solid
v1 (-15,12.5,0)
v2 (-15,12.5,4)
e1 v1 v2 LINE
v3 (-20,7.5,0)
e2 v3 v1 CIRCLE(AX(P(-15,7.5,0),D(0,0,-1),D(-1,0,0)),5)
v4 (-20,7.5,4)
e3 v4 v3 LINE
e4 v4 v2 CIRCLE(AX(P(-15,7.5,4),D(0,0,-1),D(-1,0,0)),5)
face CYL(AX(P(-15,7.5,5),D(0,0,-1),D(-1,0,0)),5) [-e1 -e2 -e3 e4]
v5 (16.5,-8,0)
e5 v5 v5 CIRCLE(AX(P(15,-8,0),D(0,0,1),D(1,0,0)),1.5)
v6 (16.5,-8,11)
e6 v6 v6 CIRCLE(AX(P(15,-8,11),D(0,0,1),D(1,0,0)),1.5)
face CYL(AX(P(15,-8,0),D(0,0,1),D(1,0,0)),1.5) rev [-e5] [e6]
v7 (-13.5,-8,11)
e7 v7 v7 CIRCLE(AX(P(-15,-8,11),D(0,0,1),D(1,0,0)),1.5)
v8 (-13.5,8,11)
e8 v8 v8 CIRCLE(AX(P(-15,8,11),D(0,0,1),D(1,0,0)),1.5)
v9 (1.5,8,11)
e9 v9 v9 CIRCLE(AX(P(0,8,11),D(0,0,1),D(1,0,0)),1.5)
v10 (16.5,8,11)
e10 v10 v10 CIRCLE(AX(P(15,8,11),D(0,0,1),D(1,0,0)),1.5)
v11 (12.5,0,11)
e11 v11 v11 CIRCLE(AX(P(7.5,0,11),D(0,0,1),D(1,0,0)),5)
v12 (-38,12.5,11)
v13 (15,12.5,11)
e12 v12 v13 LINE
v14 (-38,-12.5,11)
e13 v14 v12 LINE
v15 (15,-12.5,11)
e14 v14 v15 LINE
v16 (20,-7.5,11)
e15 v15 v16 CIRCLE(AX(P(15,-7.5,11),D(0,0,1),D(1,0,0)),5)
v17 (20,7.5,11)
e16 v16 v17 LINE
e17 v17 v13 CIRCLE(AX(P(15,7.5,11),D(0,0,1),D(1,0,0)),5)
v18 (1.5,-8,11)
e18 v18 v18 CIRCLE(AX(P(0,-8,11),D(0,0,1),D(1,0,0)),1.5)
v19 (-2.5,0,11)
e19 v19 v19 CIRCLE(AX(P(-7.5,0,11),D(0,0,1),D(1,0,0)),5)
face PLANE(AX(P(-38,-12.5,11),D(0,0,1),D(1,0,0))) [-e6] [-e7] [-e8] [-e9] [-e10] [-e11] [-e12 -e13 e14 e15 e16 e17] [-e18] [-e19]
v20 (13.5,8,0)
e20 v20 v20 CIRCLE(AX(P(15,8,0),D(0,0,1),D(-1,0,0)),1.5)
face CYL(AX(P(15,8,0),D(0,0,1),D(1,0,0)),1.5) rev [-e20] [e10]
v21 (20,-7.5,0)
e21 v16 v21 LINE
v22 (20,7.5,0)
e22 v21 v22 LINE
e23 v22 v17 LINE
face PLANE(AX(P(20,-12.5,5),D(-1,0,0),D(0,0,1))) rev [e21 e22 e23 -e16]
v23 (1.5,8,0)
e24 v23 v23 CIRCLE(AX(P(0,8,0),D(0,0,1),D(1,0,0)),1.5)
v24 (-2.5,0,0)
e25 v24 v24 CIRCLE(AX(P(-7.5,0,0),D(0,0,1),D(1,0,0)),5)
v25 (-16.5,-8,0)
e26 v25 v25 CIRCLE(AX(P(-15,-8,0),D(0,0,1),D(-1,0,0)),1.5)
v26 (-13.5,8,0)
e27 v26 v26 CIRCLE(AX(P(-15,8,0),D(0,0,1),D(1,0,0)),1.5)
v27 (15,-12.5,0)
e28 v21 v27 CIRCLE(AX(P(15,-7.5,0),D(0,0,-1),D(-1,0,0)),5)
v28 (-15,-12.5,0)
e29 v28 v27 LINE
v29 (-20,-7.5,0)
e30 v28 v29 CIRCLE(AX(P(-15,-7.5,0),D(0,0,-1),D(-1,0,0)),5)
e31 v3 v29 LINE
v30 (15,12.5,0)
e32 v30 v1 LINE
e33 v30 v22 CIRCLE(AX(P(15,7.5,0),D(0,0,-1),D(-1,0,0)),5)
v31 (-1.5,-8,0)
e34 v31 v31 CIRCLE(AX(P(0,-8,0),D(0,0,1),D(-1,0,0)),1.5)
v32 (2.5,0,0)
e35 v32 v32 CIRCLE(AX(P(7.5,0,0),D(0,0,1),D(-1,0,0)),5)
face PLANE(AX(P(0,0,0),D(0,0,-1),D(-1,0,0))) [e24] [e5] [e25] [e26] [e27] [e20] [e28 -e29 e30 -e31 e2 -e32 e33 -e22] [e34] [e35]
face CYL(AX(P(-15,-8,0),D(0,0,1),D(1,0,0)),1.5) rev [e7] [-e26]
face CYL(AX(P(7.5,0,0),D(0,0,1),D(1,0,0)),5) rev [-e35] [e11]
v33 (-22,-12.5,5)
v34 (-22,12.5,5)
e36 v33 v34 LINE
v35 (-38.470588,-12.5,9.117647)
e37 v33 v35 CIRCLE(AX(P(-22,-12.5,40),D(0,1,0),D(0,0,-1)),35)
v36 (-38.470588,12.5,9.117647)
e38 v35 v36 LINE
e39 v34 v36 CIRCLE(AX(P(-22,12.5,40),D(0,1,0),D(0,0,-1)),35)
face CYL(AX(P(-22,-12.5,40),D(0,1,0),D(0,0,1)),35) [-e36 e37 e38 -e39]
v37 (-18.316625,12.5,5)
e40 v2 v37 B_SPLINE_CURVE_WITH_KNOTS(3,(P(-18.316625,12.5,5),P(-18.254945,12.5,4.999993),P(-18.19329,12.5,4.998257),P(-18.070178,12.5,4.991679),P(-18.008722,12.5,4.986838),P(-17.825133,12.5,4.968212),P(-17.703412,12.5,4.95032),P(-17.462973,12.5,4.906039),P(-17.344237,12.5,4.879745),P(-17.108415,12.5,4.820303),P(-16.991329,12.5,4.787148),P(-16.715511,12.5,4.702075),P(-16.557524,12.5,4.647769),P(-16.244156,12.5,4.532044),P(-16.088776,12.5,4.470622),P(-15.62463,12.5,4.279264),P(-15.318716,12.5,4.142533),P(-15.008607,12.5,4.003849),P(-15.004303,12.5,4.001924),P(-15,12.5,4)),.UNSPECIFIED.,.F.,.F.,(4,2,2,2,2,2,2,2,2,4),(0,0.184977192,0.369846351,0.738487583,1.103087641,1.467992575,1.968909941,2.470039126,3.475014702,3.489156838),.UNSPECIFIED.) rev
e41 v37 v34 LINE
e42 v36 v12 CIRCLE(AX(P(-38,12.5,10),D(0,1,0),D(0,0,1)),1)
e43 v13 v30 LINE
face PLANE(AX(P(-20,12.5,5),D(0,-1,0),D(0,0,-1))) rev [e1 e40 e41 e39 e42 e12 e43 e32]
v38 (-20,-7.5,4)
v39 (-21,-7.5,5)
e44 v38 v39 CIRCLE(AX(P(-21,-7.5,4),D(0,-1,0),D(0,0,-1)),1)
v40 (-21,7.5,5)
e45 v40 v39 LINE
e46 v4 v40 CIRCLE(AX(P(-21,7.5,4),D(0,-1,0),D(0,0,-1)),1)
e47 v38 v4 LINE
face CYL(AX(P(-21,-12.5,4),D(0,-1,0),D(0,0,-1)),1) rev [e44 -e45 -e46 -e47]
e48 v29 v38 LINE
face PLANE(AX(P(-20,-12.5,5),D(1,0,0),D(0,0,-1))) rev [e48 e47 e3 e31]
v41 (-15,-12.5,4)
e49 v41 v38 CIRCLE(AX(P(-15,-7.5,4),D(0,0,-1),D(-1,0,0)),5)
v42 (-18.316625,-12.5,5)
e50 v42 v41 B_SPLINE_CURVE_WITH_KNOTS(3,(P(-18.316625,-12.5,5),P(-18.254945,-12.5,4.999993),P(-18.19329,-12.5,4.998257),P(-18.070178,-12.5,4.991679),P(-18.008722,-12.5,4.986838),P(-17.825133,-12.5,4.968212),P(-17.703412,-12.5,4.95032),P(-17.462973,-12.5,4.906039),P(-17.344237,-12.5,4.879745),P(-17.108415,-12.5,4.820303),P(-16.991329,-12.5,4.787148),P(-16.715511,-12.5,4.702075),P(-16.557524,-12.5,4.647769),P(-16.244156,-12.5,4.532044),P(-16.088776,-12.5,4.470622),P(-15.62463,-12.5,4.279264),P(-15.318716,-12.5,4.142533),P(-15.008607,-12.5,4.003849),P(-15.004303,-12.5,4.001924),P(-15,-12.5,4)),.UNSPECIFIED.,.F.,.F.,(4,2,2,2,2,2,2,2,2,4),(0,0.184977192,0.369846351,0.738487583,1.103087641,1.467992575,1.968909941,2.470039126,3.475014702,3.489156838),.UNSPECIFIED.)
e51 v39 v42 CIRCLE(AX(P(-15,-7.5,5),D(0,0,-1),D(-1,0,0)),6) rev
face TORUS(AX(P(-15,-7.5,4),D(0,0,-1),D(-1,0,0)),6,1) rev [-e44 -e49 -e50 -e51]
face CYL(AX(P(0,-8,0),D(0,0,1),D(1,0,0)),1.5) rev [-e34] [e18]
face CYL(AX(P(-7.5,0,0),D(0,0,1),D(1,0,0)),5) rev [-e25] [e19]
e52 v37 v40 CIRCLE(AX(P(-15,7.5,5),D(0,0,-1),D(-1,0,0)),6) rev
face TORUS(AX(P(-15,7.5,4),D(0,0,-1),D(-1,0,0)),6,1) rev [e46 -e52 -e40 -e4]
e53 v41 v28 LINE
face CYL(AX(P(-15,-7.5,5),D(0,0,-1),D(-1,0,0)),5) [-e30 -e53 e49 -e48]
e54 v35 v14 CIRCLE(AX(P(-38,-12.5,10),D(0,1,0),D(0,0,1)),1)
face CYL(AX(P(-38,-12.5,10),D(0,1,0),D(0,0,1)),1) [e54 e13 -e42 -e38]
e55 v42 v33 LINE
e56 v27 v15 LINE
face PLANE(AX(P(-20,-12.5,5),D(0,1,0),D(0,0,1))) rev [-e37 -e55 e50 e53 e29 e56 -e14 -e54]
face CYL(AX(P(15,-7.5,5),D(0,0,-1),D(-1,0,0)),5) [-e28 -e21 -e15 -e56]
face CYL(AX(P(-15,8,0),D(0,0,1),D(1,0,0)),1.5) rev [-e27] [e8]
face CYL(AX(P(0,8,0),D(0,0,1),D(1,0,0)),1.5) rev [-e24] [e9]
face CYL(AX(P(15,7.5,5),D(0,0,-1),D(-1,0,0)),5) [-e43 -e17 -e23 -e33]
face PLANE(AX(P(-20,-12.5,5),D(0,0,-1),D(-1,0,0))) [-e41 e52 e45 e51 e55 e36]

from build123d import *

# Parameters (mm, degrees)
SKETCH_2_W           = 40
SKETCH_2_H           = 25
EXTRUDE_1_DEPTH      = 5
SKETCH_3_R           = 1.5
CUT_EXTRUDE_1_DEPTH  = 25.109126902
SKETCH_4_R           = 5
CUT_EXTRUDE_2_DEPTH  = 25.109126902
EXTRUDE_2_DEPTH      = 12.5
EXTRUDE_2_DEPTH_BACK = 12.5
SKETCH_7_R           = 5
SKETCH_7_R_2         = 1.5
CUT_EXTRUDE_3_DEPTH  = 43.405777908
FILLET_1_R           = 5
FILLET_2_R           = 1


with BuildPart() as part:
    # 草图2 → 凸台-拉伸1 (new body)
    with BuildSketch(Plane.XY):
        Rectangle(SKETCH_2_W, SKETCH_2_H)
    extrude(amount=EXTRUDE_1_DEPTH)

    # 草图3 → 切除-拉伸1 (cut, through all)
    with BuildSketch(Plane.XY.offset(5)):
        with Locations((-15, 8)):
            Circle(SKETCH_3_R)
        with Locations((0, 8)):
            Circle(SKETCH_3_R)
        with Locations(Location((15, 8, 0), (0, 0, 180))):
            Circle(SKETCH_3_R)
        with Locations((15, -8)):
            Circle(SKETCH_3_R)
        with Locations(Location((0, -8, 0), (0, 0, 180))):
            Circle(SKETCH_3_R)
        with Locations(Location((-15, -8, 0), (0, 0, 180))):
            Circle(SKETCH_3_R)
    extrude(amount=-CUT_EXTRUDE_1_DEPTH, mode=Mode.SUBTRACT)

    # 草图4 → 切除-拉伸2 (cut, through all)
    with BuildSketch(Plane.XY.offset(5)):
        with Locations((-7.5, 0)):
            Circle(SKETCH_4_R)
        with Locations(Location((7.5, 0, 0), (0, 0, 180))):
            Circle(SKETCH_4_R)
    extrude(amount=-CUT_EXTRUDE_2_DEPTH, mode=Mode.SUBTRACT)

    # 草图6 → 凸台-拉伸2 (add, two sides: drawn at the far end of the back side and taken through both)
    with BuildSketch(Plane(origin=(0, 0, 0), x_dir=(1, 0, 0), z_dir=(0, 1, 0)).offset(-EXTRUDE_2_DEPTH_BACK)):
        with BuildLine():
            Line((-20, -5), (-22, -5))
            ThreePointArc((-22, -5), (-30.488746876, -6.045012495), (-38.470588235, -9.117647059))
            ThreePointArc((-38.470588235, -9.117647059), (-38.9701425, -10.242535625), (-38, -11))
            Line((-38, -11), (20, -11))
            Line((20, -11), (20, -5))
            Line((20, -5), (-20, -5))
        make_face()
    extrude(amount=EXTRUDE_2_DEPTH + EXTRUDE_2_DEPTH_BACK)

    # 草图7 → 切除-拉伸3 (cut, through all)
    with BuildSketch(Plane.XY.offset(11)):
        with Locations((7.5, 0)):
            Circle(SKETCH_7_R)
        with Locations((-15, -8)):
            Circle(SKETCH_7_R_2)
        with Locations((-7.5, 0)):
            Circle(SKETCH_7_R)
        with Locations((0, -8)):
            Circle(SKETCH_7_R_2)
        with Locations((15, -8)):
            Circle(SKETCH_7_R_2)
        with Locations((0, 8)):
            Circle(SKETCH_7_R_2)
        with Locations((-15, 8)):
            Circle(SKETCH_7_R_2)
        with Locations((15, 8)):
            Circle(SKETCH_7_R_2)
    extrude(amount=-CUT_EXTRUDE_3_DEPTH, mode=Mode.SUBTRACT)

    # 圆角1
    fillet_1_edges = [part.edges().sort_by_distance(p)[0] for p in [
        (20, -12.5, 5.5),
        (-20, -12.5, 2.5),
        (-20, 12.5, 2.5),
        (20, 12.5, 5.5),
    ]]
    fillet(fillet_1_edges, radius=FILLET_1_R)

    # 圆角2
    # the kernel refuses this fillet: 1 mm, written as the material it adds along each edge
    with BuildSketch(Plane(origin=(-20, 7.5, 5), x_dir=(0, 0, -1), z_dir=(0, -1, 0))) as fillet_2_piece_1:
        with BuildLine():
            CenterArc((FILLET_2_R, -FILLET_2_R), FILLET_2_R, 90, 90)
            Line((0, -FILLET_2_R), (0, 0))
            Line((0, 0), (FILLET_2_R, 0))
        make_face()
    extrude(amount=15)
    with BuildSketch(Plane(origin=(-15, -7.5, 5), x_dir=(0.7515057138603054, -0.6597265812708418, 0), z_dir=(0.6597265812708418, 0.7515057138603054, 0))) as fillet_2_piece_2_section:
        with BuildLine():
            CenterArc((5 + FILLET_2_R, FILLET_2_R), FILLET_2_R, 180, 90)
            Line((5, FILLET_2_R), (5, 0))
            Line((5, 0), (5 + FILLET_2_R, 0))
        make_face()
    fillet_2_piece_2 = revolve(axis=Axis((-15, -7.5, 5), (0, 0, -1)), revolution_arc=138.720976341, mode=Mode.PRIVATE)
    fillet_2_piece_2 = split(fillet_2_piece_2, bisect_by=Plane(origin=(-15, -12.5, 5), z_dir=(0, 1, 0)), keep=Keep.TOP, mode=Mode.PRIVATE)
    add(fillet_2_piece_2)
    with BuildSketch(Plane(origin=(-15, 7.5, 5), x_dir=(0.7515057138603056, 0.6597265812708417, 0), z_dir=(0.6597265812708417, -0.7515057138603056, 0))) as fillet_2_piece_3_section:
        with BuildLine():
            CenterArc((5 + FILLET_2_R, -FILLET_2_R), FILLET_2_R, 90, 90)
            Line((5 + FILLET_2_R, 0), (5, 0))
            Line((5, 0), (5, -FILLET_2_R))
        make_face()
    fillet_2_piece_3 = revolve(axis=Axis((-15, 7.5, 5), (0, 0, 1)), revolution_arc=138.720976341, mode=Mode.PRIVATE)
    fillet_2_piece_3 = split(fillet_2_piece_3, bisect_by=Plane(origin=(-15, 12.5, 5), z_dir=(0, -1, 0)), keep=Keep.TOP, mode=Mode.PRIVATE)
    add(fillet_2_piece_3)


solid = part.part
